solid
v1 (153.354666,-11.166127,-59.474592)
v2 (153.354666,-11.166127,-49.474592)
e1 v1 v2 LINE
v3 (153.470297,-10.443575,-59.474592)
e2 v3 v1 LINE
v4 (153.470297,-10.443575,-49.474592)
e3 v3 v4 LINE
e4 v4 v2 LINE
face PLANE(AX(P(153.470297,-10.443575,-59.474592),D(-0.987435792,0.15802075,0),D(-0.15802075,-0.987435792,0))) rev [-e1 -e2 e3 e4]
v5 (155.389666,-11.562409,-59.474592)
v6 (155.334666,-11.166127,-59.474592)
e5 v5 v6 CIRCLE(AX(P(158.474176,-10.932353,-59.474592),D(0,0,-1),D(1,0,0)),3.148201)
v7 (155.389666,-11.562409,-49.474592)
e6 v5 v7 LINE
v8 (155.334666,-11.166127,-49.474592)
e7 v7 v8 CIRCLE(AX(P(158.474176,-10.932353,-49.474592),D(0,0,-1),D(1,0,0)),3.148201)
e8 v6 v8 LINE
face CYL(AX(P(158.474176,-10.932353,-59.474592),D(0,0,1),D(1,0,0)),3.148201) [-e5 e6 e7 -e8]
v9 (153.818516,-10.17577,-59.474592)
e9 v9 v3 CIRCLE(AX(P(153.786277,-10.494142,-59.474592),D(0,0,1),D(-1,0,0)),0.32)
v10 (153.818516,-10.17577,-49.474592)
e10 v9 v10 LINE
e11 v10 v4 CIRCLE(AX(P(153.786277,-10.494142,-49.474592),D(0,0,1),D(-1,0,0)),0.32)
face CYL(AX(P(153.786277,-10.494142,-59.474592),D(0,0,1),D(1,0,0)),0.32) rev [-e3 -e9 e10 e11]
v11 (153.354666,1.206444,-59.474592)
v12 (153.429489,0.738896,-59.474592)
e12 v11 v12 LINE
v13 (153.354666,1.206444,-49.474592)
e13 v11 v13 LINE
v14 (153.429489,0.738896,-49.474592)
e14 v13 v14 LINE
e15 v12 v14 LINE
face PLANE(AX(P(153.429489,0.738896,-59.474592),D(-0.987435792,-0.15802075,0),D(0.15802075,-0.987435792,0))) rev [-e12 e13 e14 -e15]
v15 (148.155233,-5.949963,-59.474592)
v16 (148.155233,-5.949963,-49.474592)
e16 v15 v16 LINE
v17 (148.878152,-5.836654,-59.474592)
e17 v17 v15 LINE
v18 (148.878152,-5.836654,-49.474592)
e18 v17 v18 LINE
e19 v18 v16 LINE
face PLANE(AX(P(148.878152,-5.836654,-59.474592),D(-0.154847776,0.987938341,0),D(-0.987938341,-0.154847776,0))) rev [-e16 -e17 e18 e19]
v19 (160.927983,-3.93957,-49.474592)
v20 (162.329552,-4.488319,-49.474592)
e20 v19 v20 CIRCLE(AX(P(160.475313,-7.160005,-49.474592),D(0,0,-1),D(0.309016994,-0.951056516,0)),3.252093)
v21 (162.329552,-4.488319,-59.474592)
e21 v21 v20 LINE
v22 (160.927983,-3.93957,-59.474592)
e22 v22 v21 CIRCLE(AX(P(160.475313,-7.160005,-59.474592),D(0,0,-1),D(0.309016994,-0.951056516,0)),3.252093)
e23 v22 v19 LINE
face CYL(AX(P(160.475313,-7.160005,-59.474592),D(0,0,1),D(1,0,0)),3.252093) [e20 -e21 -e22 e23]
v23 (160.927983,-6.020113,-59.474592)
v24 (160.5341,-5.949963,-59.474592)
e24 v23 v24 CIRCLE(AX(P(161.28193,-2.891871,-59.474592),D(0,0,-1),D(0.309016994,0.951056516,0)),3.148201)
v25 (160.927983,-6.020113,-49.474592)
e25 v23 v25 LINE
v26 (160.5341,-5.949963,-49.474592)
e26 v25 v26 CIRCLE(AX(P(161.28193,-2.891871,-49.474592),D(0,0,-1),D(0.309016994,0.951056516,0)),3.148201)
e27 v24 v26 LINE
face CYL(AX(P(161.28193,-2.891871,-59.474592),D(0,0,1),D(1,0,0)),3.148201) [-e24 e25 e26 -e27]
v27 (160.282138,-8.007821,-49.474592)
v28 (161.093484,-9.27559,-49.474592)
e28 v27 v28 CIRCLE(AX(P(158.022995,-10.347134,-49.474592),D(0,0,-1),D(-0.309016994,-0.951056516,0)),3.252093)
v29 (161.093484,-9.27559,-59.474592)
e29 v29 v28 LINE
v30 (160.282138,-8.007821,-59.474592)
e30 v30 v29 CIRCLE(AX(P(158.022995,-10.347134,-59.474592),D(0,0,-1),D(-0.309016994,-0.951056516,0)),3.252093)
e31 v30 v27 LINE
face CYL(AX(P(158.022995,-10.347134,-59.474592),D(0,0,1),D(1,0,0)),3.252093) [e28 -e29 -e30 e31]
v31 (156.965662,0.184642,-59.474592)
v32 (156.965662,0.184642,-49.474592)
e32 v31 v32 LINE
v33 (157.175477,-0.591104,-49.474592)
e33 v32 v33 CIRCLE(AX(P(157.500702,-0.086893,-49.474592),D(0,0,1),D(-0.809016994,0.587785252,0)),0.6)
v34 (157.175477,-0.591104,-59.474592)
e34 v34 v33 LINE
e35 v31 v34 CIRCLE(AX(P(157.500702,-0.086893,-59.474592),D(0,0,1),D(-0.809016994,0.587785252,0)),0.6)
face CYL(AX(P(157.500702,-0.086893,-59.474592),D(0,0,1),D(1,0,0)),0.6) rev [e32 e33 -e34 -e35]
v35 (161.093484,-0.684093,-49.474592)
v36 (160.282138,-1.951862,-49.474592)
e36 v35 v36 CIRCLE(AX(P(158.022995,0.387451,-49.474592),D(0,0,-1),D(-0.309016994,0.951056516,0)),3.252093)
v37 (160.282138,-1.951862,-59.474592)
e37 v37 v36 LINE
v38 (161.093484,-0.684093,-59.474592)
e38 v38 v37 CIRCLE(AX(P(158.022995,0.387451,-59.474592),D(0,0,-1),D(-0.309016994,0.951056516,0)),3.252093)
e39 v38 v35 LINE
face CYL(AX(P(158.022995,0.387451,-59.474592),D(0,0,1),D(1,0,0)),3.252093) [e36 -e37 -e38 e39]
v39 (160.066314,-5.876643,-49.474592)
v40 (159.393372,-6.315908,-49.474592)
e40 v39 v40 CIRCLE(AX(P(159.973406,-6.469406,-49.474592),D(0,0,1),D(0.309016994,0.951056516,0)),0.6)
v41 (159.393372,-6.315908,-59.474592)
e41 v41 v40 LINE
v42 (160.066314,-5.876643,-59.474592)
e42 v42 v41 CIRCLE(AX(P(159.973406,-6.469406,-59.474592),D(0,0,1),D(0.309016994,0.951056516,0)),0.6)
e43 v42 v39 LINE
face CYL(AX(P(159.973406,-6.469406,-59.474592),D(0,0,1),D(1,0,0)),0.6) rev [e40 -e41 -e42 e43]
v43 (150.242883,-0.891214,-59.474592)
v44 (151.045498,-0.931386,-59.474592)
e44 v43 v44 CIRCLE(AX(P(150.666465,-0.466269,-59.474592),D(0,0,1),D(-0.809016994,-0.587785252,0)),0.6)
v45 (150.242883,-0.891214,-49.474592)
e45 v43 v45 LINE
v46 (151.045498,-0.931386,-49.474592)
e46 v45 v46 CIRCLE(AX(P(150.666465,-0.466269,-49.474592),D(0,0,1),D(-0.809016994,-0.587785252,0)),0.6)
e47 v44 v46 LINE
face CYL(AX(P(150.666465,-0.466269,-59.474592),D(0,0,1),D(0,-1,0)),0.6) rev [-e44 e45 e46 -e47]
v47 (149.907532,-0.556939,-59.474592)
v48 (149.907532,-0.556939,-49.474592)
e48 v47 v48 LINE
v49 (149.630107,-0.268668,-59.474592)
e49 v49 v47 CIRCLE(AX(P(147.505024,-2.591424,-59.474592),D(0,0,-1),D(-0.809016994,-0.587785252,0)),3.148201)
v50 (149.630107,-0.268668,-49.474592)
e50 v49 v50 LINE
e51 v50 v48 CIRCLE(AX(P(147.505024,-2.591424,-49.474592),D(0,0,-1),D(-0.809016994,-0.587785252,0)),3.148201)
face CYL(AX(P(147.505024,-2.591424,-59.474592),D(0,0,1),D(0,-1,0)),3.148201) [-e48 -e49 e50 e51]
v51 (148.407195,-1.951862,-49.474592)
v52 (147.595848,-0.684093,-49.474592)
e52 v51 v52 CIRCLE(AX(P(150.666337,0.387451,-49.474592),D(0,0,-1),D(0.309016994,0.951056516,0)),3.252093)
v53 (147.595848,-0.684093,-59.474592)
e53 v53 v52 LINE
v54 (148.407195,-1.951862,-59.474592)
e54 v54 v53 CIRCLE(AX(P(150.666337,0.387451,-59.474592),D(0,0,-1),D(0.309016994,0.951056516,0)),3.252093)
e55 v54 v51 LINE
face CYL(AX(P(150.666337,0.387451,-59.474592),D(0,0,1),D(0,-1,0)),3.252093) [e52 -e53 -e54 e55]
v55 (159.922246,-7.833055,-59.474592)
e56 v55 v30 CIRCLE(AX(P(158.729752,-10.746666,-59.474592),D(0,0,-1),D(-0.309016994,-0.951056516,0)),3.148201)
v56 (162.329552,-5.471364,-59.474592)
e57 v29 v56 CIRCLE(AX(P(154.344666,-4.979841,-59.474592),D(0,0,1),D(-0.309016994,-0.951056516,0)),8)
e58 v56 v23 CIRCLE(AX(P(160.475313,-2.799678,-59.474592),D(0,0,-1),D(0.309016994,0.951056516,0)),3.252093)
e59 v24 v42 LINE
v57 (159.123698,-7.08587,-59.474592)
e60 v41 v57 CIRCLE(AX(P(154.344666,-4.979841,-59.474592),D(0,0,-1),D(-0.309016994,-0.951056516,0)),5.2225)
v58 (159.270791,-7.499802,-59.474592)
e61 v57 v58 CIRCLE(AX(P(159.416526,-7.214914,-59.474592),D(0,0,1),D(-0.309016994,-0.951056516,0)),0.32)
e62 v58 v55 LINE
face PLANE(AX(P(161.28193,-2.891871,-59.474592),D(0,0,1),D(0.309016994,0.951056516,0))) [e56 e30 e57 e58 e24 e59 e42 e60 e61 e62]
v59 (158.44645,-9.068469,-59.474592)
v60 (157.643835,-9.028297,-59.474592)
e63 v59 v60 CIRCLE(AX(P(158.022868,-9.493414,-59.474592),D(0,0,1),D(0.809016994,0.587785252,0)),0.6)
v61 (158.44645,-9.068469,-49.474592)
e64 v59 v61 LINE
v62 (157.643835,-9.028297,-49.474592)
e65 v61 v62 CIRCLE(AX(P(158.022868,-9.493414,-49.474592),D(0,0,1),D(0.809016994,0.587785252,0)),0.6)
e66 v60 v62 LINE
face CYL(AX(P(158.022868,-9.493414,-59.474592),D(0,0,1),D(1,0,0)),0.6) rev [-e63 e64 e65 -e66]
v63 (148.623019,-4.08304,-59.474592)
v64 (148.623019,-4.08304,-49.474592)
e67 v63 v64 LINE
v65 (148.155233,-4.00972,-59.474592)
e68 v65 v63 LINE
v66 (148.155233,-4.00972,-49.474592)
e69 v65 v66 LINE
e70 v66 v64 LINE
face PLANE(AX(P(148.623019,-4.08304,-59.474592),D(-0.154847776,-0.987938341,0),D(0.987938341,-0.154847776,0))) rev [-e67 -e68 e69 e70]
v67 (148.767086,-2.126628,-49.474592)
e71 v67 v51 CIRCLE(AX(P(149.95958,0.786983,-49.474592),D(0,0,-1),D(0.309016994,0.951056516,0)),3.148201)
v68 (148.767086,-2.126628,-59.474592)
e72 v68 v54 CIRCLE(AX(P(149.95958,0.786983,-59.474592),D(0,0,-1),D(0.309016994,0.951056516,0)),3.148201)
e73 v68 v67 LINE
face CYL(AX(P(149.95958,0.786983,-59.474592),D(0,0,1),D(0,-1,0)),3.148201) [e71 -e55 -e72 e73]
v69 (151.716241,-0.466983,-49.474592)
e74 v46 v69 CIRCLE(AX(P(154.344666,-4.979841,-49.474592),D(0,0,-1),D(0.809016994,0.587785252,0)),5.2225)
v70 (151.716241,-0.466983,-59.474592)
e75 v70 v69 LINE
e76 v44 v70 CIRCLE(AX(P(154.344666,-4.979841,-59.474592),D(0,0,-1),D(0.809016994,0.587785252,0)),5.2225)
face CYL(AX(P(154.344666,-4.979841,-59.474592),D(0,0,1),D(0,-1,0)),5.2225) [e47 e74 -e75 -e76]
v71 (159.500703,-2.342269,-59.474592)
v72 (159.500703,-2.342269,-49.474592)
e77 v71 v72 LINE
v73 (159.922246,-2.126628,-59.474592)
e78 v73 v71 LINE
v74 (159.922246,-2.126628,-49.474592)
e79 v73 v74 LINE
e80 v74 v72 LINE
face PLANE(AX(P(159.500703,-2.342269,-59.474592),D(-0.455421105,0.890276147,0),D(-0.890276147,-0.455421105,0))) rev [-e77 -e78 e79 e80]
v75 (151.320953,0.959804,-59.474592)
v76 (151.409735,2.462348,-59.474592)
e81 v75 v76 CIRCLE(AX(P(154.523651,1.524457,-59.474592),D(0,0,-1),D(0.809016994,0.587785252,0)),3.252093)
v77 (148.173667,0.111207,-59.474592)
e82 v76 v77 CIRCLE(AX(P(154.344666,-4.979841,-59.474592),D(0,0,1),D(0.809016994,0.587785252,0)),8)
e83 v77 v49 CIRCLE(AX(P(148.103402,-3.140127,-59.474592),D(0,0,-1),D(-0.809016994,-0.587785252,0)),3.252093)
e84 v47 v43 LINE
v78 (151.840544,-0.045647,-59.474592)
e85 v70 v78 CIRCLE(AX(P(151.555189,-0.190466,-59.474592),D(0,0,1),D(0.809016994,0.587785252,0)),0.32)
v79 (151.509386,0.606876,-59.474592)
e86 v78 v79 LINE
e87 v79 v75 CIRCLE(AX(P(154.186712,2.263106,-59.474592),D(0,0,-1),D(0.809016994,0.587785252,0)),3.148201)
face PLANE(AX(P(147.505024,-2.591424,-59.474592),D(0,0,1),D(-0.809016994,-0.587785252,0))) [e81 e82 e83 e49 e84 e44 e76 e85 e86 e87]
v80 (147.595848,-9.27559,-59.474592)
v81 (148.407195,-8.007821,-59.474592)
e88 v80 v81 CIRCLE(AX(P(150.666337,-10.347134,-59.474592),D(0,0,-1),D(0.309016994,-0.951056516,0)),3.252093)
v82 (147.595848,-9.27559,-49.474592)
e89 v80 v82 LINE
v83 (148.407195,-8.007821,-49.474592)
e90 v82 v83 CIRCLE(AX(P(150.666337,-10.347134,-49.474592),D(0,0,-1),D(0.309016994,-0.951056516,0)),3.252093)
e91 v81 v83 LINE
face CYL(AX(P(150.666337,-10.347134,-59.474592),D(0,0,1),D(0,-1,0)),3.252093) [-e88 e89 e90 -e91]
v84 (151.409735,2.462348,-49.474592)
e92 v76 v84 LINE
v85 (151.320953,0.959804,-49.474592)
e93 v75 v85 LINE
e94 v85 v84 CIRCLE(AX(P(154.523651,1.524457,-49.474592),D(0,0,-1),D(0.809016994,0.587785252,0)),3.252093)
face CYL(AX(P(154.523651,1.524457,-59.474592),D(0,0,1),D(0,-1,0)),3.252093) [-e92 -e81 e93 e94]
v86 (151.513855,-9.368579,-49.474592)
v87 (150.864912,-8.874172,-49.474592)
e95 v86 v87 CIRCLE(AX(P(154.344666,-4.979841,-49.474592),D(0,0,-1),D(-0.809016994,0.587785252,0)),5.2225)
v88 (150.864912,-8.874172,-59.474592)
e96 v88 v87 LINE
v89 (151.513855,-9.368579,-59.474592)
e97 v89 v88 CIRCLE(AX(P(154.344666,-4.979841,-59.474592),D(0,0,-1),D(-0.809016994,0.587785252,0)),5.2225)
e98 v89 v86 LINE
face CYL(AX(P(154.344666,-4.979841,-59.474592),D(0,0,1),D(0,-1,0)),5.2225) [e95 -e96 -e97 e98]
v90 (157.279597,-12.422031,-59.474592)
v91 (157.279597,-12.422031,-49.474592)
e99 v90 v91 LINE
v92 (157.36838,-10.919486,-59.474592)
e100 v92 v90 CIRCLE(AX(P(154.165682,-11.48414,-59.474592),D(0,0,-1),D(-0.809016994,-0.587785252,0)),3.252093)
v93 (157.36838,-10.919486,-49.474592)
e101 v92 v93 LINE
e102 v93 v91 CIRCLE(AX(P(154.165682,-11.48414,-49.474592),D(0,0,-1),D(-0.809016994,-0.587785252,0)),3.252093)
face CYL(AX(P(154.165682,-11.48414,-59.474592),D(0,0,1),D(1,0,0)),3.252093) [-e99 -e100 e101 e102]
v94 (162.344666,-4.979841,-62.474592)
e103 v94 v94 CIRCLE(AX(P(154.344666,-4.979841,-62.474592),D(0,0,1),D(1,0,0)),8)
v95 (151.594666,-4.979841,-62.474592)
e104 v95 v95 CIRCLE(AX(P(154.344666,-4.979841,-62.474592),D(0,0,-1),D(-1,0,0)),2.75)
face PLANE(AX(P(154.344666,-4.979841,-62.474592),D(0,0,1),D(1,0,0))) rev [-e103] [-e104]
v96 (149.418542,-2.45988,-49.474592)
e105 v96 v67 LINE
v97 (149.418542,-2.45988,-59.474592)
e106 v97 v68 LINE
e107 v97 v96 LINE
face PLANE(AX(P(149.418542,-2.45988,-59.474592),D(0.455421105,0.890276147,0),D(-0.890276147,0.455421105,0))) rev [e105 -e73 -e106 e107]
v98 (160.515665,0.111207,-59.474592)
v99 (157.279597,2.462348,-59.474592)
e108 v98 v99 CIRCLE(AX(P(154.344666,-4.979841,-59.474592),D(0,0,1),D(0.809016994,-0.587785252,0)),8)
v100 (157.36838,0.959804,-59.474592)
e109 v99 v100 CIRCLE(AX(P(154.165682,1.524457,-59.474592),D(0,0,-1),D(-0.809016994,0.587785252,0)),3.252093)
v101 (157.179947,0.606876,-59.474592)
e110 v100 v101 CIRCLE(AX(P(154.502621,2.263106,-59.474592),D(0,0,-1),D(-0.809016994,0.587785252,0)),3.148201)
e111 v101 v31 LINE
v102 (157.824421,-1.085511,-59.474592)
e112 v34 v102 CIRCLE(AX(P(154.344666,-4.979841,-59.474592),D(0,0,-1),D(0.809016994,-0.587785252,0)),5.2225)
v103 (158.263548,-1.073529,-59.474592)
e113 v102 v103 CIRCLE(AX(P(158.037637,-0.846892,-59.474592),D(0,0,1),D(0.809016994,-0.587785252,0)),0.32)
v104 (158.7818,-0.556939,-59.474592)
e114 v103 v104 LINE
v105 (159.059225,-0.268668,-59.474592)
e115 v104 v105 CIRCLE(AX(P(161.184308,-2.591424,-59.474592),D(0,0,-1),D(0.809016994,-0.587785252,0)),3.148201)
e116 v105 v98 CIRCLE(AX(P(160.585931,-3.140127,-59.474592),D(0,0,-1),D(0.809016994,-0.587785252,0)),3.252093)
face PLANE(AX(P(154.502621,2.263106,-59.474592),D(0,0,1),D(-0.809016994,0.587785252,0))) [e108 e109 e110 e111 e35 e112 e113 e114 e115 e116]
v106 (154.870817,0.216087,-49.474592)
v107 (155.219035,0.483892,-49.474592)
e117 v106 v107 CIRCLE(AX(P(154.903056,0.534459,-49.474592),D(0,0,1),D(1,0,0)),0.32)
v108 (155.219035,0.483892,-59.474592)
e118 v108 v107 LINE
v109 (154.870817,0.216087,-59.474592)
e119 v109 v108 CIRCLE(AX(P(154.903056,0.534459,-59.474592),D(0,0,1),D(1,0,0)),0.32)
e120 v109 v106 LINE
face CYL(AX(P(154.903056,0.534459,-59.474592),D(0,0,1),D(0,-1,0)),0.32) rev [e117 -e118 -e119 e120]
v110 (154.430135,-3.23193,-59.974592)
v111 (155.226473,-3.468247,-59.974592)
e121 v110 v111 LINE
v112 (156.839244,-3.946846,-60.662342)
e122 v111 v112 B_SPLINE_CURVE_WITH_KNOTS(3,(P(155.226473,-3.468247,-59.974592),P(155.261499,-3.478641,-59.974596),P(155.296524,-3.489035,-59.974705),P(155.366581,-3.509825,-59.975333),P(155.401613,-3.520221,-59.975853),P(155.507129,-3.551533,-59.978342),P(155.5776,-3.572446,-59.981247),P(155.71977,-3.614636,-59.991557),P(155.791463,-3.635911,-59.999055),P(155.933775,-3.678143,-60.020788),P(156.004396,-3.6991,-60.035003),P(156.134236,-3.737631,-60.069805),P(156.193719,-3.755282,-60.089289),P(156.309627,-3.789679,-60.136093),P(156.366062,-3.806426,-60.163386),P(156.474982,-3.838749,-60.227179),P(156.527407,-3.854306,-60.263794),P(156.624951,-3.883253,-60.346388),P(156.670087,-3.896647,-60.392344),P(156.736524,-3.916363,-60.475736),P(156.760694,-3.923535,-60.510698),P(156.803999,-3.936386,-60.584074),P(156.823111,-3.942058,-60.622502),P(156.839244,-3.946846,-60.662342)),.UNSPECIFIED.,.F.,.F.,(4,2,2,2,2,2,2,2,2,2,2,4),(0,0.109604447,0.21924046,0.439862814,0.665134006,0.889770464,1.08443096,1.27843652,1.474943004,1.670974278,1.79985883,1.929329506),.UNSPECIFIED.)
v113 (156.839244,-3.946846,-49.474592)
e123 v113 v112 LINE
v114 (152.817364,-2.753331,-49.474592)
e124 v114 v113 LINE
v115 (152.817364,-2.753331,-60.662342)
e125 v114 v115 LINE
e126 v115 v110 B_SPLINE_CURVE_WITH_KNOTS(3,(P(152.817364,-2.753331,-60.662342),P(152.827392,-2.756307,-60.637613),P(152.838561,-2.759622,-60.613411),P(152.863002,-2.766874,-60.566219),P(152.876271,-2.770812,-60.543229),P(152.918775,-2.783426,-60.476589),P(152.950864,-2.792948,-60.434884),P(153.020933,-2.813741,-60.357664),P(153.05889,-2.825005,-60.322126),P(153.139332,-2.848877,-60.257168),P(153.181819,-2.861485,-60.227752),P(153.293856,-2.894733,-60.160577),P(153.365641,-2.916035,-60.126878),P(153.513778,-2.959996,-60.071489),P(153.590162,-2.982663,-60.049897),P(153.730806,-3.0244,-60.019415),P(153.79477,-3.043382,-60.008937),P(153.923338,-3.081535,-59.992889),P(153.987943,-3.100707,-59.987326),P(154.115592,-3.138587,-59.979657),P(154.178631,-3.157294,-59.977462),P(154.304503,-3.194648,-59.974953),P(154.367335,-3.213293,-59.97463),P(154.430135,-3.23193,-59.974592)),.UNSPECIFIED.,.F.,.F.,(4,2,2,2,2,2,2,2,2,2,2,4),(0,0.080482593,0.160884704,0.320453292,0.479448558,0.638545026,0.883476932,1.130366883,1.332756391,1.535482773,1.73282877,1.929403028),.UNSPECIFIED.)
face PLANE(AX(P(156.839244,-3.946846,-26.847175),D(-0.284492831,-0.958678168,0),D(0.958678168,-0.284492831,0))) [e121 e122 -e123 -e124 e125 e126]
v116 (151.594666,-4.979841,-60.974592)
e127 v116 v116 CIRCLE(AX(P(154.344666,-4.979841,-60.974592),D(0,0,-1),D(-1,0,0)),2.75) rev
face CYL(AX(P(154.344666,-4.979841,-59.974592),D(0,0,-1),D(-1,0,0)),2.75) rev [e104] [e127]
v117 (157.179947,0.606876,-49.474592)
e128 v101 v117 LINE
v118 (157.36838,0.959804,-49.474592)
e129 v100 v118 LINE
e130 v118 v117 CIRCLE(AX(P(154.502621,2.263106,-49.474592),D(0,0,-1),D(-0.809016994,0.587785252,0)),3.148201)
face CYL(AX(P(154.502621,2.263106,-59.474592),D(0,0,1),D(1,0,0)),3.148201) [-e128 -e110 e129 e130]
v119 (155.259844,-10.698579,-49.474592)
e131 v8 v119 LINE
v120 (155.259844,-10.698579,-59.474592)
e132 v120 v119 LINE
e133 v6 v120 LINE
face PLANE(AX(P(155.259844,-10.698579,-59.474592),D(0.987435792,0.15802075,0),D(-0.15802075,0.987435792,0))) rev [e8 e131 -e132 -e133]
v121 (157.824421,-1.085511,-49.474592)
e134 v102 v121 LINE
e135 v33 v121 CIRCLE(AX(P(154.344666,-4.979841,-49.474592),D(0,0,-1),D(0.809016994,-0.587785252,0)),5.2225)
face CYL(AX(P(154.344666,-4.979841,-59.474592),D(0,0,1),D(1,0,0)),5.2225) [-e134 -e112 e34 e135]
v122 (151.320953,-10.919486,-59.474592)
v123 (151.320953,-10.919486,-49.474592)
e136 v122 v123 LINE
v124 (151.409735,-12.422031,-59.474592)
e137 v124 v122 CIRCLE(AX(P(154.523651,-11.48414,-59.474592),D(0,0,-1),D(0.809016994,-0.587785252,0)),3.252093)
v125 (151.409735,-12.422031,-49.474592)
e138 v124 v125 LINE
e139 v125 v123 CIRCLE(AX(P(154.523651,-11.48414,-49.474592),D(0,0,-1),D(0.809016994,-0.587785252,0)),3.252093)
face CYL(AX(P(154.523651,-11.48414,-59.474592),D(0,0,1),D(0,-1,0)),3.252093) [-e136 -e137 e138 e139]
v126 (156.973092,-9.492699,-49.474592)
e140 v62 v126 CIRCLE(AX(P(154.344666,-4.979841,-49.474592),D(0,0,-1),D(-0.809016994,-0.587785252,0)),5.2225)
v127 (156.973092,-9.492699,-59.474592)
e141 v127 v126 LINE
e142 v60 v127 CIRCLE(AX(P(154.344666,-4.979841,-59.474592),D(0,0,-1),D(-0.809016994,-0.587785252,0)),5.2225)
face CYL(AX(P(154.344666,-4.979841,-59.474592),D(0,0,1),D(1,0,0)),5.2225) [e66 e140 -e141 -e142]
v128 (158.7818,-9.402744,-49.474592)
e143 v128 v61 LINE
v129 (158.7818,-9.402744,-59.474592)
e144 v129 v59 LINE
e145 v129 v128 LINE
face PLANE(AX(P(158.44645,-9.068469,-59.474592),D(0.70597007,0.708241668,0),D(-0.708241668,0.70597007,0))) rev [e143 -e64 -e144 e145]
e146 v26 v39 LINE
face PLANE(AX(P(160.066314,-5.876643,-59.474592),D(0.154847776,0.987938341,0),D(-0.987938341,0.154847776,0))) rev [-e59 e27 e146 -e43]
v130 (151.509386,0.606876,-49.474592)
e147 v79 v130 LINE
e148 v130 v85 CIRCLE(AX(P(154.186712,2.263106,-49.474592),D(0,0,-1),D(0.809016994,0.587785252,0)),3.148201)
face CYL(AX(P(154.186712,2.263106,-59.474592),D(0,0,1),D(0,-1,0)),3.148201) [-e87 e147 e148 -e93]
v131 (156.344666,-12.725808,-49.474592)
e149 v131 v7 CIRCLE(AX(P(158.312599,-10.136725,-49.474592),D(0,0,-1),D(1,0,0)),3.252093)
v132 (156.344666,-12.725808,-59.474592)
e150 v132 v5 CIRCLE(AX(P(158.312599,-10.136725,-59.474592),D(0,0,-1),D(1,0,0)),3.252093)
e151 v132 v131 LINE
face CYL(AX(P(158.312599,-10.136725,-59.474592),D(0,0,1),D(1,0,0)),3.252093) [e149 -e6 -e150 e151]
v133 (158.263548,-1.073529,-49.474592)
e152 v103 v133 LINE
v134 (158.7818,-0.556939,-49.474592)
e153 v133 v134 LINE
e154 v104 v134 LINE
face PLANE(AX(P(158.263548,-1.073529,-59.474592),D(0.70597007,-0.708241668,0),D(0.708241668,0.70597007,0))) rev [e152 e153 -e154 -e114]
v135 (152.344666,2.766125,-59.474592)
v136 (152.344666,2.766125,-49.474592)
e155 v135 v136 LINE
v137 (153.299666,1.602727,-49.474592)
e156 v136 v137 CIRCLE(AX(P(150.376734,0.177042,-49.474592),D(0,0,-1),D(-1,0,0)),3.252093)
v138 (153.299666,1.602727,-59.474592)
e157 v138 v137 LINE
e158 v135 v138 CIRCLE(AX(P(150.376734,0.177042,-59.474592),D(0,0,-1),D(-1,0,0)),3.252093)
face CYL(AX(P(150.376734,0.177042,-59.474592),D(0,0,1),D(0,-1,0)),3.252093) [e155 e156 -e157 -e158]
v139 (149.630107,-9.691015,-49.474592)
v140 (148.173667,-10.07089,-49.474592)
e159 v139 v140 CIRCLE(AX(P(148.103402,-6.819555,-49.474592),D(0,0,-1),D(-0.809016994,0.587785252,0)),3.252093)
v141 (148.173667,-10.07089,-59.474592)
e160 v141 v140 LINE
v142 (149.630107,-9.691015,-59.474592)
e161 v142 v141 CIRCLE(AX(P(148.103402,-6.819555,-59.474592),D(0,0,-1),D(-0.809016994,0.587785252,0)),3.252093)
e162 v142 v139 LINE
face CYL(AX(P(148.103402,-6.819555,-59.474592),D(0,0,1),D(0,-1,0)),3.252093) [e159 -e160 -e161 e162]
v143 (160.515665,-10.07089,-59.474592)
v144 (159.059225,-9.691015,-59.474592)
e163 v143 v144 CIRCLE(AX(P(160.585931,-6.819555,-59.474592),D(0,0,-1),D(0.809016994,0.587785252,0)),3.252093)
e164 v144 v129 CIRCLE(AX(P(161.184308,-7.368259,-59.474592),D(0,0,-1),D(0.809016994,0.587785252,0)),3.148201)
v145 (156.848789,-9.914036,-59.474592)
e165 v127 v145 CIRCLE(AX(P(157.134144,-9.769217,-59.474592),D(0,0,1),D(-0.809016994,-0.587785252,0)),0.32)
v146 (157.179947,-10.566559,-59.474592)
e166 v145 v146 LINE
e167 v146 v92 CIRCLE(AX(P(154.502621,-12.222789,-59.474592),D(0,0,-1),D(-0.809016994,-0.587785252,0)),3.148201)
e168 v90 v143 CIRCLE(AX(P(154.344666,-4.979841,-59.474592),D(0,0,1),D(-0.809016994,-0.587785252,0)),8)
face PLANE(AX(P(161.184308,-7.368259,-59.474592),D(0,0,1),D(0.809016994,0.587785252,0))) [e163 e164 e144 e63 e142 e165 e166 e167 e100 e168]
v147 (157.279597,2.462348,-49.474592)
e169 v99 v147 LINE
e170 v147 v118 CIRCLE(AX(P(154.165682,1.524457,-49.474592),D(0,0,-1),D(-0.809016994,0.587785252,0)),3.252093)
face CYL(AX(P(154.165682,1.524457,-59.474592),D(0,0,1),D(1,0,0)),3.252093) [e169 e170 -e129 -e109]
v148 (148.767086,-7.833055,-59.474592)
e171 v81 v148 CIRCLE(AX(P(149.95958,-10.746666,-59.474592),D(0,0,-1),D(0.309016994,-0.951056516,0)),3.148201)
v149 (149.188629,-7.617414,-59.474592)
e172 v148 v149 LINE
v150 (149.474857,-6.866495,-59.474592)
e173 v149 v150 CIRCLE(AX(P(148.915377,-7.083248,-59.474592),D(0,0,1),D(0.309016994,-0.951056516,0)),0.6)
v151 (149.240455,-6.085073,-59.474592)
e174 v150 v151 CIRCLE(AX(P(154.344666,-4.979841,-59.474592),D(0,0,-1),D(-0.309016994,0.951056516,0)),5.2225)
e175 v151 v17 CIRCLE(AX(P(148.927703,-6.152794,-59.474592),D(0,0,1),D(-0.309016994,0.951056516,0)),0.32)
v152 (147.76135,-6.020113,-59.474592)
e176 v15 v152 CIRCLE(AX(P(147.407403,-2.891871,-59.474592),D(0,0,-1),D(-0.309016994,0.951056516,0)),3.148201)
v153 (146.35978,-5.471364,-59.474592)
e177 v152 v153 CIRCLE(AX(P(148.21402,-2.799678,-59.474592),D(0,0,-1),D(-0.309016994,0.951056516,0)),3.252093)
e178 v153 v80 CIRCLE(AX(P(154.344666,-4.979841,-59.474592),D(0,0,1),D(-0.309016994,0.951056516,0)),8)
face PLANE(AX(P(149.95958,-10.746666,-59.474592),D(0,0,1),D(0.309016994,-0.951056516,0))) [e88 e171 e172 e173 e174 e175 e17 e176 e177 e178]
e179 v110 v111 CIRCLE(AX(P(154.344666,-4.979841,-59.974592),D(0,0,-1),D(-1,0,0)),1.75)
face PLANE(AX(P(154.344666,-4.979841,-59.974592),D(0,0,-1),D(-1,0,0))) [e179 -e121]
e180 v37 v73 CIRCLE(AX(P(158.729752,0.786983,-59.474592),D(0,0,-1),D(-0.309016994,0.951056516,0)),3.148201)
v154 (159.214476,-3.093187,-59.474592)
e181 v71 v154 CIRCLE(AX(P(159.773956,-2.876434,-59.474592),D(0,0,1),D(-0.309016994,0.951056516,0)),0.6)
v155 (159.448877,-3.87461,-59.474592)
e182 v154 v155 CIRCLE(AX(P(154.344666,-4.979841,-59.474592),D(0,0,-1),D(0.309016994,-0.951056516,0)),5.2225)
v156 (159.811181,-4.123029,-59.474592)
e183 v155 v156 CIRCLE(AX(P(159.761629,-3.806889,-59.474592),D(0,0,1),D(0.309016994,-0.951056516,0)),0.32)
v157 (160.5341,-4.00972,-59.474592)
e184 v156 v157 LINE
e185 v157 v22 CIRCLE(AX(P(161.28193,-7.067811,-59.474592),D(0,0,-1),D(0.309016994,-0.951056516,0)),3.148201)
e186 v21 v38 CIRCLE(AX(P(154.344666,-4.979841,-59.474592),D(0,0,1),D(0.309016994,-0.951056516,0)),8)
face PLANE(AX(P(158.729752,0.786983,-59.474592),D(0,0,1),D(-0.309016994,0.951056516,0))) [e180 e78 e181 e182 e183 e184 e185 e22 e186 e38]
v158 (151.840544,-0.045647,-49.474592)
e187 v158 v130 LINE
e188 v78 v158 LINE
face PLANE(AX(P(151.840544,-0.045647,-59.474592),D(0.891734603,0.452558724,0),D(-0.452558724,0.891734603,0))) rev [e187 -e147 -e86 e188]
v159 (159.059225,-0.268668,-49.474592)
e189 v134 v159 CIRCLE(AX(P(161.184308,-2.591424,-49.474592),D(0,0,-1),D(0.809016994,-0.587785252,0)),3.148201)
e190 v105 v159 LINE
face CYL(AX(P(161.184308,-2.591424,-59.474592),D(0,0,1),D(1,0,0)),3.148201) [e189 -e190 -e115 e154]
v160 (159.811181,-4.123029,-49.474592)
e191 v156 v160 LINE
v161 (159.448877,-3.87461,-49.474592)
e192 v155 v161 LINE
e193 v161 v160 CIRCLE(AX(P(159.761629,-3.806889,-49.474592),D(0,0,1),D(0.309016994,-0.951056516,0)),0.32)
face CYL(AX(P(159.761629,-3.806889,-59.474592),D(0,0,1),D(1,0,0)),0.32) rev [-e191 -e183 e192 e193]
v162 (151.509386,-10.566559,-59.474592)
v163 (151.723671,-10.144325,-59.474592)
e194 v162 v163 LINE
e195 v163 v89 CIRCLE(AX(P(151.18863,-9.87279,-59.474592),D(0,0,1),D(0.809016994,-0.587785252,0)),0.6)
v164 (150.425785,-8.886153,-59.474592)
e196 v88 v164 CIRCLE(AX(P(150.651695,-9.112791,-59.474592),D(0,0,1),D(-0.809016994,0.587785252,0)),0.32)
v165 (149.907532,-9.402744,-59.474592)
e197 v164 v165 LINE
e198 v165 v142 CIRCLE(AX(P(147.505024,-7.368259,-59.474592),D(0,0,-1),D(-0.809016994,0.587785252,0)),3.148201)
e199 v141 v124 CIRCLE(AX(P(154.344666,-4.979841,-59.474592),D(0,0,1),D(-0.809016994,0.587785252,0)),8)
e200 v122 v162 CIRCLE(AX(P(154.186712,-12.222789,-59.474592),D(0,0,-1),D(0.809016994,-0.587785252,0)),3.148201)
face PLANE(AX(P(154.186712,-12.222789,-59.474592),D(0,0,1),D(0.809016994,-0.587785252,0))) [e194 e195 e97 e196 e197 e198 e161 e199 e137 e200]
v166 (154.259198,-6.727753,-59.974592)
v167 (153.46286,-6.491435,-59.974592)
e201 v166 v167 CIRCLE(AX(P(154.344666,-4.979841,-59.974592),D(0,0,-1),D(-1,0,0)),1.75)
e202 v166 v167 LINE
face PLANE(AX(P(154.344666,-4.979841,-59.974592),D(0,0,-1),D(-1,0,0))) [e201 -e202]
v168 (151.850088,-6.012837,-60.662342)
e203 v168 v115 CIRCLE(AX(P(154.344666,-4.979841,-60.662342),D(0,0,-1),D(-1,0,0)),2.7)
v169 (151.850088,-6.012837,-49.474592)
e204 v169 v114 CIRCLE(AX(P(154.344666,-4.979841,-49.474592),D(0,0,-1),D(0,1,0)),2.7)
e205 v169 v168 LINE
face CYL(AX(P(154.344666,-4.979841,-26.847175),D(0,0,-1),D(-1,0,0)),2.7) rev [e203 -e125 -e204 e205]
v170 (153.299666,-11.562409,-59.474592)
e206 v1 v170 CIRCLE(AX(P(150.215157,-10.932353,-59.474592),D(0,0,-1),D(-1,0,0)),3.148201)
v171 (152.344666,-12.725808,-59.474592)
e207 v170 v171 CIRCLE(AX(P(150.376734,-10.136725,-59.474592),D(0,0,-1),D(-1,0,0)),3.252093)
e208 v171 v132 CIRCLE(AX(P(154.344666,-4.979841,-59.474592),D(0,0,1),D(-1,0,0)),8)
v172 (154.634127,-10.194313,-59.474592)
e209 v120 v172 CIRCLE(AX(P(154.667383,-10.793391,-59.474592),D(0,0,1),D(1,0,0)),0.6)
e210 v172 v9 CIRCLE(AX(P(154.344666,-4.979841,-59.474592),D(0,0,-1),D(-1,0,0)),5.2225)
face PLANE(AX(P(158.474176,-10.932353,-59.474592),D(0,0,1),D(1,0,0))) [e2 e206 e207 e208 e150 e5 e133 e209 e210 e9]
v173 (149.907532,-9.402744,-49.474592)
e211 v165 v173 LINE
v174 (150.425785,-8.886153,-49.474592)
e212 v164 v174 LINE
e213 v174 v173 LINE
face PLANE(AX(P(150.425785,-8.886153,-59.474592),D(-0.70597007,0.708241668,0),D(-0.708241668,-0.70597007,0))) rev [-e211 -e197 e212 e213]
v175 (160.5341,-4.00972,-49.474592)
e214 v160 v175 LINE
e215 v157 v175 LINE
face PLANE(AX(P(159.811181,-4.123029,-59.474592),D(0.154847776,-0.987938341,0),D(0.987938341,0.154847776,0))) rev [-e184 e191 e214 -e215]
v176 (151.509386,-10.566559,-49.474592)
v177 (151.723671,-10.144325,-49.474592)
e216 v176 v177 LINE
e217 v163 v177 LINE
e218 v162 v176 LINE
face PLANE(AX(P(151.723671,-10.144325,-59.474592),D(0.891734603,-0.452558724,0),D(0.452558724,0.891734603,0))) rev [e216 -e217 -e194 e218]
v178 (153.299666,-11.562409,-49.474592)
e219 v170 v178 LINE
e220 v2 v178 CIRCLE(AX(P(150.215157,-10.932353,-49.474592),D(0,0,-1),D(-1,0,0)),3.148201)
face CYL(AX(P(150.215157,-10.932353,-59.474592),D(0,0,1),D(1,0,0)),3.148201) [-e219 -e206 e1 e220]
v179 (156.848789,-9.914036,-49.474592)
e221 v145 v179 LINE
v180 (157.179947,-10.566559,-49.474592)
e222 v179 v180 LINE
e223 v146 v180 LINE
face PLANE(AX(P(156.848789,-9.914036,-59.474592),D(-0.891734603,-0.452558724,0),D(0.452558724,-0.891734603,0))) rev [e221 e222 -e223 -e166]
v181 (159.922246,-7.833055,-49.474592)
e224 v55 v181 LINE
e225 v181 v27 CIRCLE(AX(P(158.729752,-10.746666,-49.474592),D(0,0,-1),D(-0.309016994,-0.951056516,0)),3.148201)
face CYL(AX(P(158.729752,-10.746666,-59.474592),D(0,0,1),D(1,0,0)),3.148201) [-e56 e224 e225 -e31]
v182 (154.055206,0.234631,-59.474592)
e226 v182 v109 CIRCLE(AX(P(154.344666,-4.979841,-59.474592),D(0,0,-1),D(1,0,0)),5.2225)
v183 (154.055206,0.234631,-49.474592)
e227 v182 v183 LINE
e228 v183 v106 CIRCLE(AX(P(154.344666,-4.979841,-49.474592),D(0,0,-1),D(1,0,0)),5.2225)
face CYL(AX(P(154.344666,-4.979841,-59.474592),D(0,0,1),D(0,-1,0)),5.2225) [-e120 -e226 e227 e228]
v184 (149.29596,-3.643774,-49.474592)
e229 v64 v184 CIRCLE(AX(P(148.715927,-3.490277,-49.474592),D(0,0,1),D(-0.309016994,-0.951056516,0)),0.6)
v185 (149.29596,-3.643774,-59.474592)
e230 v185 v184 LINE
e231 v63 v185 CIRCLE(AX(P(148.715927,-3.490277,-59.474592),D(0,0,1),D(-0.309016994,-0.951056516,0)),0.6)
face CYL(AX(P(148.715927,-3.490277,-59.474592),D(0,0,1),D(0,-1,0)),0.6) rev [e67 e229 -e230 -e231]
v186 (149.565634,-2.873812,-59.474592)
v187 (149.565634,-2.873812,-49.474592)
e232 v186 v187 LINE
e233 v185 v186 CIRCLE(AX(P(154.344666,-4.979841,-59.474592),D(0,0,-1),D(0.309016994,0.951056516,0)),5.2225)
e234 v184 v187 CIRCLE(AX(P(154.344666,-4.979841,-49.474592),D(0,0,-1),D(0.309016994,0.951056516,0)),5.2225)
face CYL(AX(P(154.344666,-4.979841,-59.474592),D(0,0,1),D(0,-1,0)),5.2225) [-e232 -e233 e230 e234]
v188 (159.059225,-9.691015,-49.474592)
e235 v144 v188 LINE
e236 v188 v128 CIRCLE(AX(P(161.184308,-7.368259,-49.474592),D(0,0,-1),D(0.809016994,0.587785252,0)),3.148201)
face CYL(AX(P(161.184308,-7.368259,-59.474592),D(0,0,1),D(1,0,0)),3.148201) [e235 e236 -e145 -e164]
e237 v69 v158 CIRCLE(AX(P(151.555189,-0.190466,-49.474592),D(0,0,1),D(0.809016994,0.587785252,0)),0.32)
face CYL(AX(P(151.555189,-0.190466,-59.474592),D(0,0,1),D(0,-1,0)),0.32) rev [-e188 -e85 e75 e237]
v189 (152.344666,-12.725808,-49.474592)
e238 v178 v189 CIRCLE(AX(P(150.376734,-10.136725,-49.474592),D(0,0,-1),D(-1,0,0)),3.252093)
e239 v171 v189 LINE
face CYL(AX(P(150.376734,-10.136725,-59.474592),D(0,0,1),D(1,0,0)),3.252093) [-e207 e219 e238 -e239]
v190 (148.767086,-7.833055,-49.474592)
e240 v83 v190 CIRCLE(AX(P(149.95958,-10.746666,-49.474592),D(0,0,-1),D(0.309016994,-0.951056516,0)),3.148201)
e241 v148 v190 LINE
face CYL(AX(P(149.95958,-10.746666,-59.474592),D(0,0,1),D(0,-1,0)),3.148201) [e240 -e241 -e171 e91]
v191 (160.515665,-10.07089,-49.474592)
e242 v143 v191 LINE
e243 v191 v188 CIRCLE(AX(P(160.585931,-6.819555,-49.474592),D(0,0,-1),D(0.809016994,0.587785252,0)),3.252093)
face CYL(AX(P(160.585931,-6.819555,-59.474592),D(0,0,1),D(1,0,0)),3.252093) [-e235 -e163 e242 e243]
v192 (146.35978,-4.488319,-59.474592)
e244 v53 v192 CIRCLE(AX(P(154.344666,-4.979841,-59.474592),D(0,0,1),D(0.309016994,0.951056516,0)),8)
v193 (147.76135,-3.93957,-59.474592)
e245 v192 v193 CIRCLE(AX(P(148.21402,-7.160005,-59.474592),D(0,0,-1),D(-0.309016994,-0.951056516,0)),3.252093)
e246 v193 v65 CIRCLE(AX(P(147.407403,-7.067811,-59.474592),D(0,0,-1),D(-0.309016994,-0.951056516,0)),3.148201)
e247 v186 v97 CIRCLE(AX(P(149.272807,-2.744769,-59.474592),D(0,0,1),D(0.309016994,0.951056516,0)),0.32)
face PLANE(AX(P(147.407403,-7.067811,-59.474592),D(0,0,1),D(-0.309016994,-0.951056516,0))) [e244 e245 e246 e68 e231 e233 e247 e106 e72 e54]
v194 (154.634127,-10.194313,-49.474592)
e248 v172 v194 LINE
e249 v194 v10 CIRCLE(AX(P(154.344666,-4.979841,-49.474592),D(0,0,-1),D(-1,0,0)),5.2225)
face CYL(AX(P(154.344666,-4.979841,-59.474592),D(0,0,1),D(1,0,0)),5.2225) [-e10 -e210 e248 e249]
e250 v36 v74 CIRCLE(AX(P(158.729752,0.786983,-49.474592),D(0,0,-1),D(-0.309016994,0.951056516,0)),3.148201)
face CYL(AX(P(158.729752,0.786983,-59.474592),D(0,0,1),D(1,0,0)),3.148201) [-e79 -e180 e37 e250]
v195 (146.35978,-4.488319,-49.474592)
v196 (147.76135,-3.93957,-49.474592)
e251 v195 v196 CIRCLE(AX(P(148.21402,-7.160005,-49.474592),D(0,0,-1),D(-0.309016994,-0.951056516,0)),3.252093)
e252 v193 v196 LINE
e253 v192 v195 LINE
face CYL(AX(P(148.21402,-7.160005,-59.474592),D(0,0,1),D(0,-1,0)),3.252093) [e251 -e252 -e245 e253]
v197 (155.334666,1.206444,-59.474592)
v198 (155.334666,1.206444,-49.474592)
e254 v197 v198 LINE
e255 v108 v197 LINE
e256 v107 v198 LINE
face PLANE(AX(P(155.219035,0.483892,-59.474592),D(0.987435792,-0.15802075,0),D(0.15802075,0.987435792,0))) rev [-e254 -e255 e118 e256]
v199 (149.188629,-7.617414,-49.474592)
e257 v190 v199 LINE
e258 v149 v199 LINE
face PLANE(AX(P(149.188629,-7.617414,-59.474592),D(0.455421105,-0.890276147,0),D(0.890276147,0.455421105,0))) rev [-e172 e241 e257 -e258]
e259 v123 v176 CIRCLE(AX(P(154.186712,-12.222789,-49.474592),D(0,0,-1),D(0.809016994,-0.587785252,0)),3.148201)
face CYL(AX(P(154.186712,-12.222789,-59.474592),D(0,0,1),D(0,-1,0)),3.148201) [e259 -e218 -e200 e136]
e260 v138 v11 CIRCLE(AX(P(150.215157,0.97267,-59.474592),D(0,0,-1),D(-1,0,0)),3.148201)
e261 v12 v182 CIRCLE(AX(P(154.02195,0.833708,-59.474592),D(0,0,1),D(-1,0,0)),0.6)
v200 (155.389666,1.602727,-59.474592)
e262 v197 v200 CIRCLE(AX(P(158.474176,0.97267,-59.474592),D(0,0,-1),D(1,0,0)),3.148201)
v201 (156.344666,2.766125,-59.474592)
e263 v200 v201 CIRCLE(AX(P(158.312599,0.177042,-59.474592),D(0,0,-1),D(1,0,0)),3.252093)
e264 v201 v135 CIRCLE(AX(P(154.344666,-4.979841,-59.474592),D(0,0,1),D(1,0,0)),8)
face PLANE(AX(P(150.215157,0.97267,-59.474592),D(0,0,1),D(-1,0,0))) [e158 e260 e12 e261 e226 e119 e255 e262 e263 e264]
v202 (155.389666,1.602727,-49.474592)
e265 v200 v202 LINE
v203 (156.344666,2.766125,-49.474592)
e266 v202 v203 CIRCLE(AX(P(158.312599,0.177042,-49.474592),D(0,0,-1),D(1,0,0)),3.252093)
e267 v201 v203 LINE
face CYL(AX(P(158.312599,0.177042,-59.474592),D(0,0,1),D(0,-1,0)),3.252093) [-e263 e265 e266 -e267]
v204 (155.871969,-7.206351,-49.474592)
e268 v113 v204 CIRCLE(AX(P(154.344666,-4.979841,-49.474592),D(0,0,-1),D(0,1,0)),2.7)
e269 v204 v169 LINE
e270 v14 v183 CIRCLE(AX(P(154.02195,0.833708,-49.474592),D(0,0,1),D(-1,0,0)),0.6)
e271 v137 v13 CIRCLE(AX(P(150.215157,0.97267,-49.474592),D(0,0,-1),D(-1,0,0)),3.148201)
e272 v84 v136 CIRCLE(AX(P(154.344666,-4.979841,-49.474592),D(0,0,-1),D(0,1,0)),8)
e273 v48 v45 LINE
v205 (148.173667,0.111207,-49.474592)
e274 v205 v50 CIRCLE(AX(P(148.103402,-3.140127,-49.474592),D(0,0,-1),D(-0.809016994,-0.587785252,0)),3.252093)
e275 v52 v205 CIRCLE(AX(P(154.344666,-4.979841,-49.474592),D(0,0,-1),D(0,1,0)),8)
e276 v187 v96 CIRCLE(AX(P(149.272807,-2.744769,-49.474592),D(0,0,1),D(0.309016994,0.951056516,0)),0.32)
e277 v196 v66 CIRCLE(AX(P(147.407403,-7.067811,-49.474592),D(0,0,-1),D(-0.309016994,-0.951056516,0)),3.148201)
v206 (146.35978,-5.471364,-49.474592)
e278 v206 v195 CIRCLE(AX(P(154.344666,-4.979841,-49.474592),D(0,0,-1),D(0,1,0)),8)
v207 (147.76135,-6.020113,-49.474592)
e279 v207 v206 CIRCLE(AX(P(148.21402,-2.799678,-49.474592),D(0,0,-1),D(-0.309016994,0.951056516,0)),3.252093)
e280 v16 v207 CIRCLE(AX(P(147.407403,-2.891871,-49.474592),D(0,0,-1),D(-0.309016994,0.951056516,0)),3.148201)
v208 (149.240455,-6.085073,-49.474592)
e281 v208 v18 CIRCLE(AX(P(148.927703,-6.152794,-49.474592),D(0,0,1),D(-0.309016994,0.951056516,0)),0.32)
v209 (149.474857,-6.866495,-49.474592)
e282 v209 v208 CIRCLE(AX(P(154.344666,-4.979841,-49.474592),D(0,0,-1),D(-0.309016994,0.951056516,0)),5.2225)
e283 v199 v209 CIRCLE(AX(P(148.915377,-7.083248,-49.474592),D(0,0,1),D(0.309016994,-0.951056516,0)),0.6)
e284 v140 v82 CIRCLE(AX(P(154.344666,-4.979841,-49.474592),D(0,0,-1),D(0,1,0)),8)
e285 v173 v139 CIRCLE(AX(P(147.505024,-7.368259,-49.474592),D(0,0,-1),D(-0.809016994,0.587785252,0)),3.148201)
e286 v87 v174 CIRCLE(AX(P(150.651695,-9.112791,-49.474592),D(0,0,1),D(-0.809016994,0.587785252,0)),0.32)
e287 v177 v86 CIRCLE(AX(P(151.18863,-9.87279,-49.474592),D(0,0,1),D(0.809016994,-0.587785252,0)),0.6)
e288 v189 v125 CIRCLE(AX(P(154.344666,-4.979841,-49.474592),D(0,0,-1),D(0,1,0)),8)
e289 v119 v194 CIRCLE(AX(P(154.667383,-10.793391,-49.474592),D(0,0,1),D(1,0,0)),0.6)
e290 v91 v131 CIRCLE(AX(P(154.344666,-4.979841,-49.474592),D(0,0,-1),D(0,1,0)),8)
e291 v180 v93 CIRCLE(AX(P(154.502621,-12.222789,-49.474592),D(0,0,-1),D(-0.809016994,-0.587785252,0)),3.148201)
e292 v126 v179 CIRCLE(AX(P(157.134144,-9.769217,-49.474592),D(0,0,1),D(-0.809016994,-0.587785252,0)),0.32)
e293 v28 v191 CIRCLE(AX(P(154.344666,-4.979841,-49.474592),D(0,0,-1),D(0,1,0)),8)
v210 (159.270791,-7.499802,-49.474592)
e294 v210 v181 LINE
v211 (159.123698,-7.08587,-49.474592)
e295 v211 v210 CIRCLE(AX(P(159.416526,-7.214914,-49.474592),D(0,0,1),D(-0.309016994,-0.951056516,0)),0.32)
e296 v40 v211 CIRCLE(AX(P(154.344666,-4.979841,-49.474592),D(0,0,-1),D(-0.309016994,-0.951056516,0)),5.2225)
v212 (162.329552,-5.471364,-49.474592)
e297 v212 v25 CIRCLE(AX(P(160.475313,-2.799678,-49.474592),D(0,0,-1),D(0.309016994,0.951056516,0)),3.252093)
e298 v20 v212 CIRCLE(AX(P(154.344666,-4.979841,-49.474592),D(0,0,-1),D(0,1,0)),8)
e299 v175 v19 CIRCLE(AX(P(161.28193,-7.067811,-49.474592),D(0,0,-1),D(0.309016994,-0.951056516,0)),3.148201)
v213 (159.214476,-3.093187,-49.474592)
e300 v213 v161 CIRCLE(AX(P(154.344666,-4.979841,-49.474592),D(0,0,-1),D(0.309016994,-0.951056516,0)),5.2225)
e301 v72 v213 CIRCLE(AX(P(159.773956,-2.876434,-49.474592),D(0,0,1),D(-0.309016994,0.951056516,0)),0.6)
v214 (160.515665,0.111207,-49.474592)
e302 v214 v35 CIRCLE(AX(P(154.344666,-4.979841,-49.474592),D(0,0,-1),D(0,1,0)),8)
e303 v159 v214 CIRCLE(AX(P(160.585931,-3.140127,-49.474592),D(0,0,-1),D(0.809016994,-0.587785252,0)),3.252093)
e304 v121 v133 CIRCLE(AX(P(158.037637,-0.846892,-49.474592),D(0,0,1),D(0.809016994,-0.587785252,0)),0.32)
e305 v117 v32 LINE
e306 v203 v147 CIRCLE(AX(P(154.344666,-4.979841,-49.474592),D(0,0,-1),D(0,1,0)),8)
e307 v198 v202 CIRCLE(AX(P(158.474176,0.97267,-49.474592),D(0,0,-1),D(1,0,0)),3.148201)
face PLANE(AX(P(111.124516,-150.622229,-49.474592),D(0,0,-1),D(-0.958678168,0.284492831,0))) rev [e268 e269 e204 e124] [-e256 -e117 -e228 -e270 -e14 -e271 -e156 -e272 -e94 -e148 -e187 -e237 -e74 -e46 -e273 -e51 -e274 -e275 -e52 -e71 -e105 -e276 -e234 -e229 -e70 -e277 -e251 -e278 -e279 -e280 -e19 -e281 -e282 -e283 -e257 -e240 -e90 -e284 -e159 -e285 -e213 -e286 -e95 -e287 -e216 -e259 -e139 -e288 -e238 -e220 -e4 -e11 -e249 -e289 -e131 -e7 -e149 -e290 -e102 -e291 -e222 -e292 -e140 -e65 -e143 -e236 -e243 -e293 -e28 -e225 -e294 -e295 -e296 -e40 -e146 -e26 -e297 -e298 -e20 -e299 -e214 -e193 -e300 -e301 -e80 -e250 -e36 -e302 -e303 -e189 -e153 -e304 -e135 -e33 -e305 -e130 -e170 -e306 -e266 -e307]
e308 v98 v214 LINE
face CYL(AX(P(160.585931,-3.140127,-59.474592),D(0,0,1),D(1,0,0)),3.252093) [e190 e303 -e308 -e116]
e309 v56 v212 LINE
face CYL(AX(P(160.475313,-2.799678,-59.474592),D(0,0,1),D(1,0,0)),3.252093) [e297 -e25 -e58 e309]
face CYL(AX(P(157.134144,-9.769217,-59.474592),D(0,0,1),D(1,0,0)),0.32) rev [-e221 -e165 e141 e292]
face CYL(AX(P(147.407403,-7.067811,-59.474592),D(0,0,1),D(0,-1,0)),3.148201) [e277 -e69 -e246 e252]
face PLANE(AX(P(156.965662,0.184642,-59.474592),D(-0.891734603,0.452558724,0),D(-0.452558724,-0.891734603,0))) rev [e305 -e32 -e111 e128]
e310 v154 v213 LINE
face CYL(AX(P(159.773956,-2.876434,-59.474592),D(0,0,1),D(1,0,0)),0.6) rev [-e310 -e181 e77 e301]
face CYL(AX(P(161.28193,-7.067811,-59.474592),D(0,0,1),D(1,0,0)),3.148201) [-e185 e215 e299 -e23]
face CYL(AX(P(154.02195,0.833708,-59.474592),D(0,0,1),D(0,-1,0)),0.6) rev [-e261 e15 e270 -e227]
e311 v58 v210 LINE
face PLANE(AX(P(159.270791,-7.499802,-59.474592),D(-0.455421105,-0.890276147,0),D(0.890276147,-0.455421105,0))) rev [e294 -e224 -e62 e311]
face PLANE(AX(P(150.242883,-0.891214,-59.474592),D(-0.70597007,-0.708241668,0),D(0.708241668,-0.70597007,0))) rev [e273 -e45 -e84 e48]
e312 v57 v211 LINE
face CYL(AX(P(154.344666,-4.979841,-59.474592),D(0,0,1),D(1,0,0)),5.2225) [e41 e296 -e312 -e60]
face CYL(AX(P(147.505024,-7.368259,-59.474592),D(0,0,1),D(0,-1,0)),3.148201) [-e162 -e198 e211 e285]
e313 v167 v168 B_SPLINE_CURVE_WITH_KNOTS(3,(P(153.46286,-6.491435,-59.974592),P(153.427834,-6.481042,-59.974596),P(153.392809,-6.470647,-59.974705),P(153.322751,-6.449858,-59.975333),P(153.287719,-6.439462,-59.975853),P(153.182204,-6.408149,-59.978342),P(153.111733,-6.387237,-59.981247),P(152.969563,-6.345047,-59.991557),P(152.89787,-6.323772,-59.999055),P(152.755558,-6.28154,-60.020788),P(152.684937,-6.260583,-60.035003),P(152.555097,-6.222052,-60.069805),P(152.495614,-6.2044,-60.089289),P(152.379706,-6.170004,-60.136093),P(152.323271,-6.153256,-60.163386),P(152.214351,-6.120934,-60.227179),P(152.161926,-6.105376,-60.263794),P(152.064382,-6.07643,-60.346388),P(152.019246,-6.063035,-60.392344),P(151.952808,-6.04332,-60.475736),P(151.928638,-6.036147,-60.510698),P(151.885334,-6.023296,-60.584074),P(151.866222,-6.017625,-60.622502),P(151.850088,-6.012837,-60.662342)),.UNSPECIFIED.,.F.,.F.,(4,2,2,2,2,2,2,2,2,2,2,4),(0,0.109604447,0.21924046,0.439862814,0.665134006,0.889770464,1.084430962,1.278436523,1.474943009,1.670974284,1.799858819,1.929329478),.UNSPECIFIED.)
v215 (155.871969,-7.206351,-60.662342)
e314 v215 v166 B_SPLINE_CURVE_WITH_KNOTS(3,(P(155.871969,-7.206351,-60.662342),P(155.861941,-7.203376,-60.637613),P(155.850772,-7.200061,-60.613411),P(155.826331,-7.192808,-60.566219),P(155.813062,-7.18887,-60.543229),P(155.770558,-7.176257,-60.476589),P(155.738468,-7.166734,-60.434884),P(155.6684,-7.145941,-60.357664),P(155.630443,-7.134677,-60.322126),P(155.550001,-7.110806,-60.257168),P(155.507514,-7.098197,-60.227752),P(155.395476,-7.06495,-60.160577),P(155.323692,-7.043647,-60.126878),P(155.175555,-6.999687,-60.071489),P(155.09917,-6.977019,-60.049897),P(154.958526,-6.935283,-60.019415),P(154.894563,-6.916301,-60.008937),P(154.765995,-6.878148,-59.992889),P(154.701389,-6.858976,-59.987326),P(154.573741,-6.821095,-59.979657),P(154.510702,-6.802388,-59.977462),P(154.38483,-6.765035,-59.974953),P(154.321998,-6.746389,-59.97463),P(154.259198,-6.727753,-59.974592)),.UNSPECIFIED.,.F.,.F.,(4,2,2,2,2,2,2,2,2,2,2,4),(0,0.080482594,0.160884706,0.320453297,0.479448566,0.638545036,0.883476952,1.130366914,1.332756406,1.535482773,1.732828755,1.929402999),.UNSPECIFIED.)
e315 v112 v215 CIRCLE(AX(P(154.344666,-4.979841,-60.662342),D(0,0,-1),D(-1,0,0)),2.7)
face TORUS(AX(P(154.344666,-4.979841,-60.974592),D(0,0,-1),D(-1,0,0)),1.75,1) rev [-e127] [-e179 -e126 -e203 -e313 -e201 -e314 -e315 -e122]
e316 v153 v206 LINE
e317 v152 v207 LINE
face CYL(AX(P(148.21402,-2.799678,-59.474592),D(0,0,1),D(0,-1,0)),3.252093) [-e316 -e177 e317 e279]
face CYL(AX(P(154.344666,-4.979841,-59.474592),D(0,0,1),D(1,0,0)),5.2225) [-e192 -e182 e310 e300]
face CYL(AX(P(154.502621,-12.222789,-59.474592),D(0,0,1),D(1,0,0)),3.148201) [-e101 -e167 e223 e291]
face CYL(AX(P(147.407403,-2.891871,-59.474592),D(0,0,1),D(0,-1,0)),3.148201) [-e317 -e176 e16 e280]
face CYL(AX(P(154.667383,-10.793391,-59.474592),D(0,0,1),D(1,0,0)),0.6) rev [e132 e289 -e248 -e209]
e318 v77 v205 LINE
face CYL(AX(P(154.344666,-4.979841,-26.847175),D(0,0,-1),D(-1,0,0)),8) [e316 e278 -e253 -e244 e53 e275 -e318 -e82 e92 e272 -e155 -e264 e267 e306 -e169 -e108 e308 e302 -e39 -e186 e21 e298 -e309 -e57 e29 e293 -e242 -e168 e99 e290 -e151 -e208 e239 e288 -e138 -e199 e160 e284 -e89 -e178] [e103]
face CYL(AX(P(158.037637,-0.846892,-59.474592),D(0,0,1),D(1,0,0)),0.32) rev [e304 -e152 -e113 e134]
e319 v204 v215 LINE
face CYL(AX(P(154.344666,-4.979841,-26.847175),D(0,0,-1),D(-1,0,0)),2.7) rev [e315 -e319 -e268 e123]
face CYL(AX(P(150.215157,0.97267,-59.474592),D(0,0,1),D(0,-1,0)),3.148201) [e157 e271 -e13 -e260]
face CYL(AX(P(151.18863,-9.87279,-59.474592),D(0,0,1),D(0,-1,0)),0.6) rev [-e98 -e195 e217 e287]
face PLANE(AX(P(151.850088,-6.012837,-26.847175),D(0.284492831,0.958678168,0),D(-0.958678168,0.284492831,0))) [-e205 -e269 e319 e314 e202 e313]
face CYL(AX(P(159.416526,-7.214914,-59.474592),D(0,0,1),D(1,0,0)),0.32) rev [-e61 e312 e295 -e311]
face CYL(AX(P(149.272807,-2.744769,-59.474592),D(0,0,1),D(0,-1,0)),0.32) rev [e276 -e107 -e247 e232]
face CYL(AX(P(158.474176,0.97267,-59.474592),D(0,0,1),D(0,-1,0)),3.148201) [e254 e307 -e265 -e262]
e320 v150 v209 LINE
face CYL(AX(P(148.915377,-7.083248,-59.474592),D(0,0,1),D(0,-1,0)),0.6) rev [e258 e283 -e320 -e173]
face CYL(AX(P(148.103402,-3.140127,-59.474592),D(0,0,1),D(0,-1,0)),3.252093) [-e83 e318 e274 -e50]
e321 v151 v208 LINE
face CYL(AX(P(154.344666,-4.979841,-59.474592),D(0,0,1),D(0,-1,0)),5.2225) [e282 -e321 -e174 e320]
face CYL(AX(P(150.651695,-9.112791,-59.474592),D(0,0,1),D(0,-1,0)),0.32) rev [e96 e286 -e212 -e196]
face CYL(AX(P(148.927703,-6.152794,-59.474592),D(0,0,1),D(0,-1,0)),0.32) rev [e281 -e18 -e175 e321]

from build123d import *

# Parameters (mm, degrees)
ESBO_O1_R                = 8
RESSALTO_EXTRUS_O1_DEPTH = 13
CORTE_EXTRUS_O1_START    = -10
CORTE_EXTRUS_O1_DEPTH    = 10
PADR_OCIRCULAR1_COUNT    = 10
ESBO_O5_R                = 2.75
CORTE_EXTRUS_O2_DEPTH    = 2.5
FILETE1_R                = 1


with BuildPart() as part:
    # Esboço1 → Ressalto-extrusão1 (new body)
    with BuildSketch(Plane.XY.offset(-62.474592215)):
        with Locations(Location((154.344666384, -4.979841337, 0), (0, 0, 90))):
            Circle(ESBO_O1_R)
        with BuildLine():
            Line((156.839244486, -3.946845648), (152.817363907, -2.753331256))
            ThreePointArc((152.817363907, -2.753331256), (151.756235333, -4.211710693), (151.850088282, -6.012837026))
            Line((151.850088282, -6.012837026), (155.871968862, -7.206351418))
            ThreePointArc((155.871968862, -7.206351418), (156.933097439, -5.747971979), (156.839244486, -3.946845648))
        make_face(mode=Mode.SUBTRACT)
    extrude(amount=RESSALTO_EXTRUS_O1_DEPTH)

    # Esboço4 → Corte-extrusão1 (cut)
    with BuildSketch(Plane.XY.offset(-49.474592215).offset(CORTE_EXTRUS_O1_START)):
        with BuildLine():
            Line((155.259844023, -10.698578623), (155.334666384, -11.166126571))
            ThreePointArc((155.334666384, -11.166126571), (155.355864946, -11.365142474), (155.389666384, -11.562409225))
            ThreePointArc((155.389666384, -11.562409225), (155.798933371, -12.200119109), (156.344666384, -12.725808029))
            ThreePointArc((156.344666384, -12.725808029), (154.344666384, -12.979841337), (152.344666384, -12.725808029))
            ThreePointArc((152.344666384, -12.725808029), (152.890399398, -12.200119109), (153.299666384, -11.562409225))
            ThreePointArc((153.299666384, -11.562409225), (153.333467823, -11.365142474), (153.354666384, -11.166126571))
            Line((153.354666384, -11.166126571), (153.470297344, -10.443574954))
            ThreePointArc((153.470297344, -10.443574954), (153.591194582, -10.240482514), (153.8185158, -10.175769725))
            ThreePointArc((153.8185158, -10.175769725), (154.225958814, -10.20099205), (154.634127125, -10.194313384))
            ThreePointArc((154.634127125, -10.194313384), (155.043877847, -10.326217347), (155.259844023, -10.698578623))
        make_face()
    corte_extrus_o1 = extrude(amount=CORTE_EXTRUS_O1_DEPTH, mode=Mode.SUBTRACT)

    # PadrãoCircular1: Corte-extrusão1 ×10 about axis
    padr_ocircular1_axis = Axis((154.344666384, -4.979841337, 0), (0, 0, 1))
    for i in range(1, PADR_OCIRCULAR1_COUNT):
        add(corte_extrus_o1.rotate(padr_ocircular1_axis, i * 360 / PADR_OCIRCULAR1_COUNT), mode=Mode.SUBTRACT)

    # Esboço5 → Corte-extrusão2 (cut)
    with BuildSketch(Plane(origin=(0, 0, -62.474592215), x_dir=(-1, 0, 0), z_dir=(0, 0, -1))):
        with Locations((-154.344666384, -4.979841337)):
            Circle(ESBO_O5_R)
    extrude(amount=-CORTE_EXTRUS_O2_DEPTH, mode=Mode.SUBTRACT)

    # Filete1
    # the kernel refuses this fillet: 1 mm, written as the material it adds along each edge
    with BuildSketch(Plane(origin=(154.344666384, -4.979841337, -59.974592215), x_dir=(-1, 0, 0), z_dir=(0, -1, 0))) as filete1_piece_1_section:
        with BuildLine():
            CenterArc((2.75 - FILETE1_R, FILETE1_R), FILETE1_R, 270, 90)
            Line((2.75 - FILETE1_R, 0), (2.75, 0))
            Line((2.75, 0), (2.75, FILETE1_R))
        make_face()
    filete1_piece_1 = revolve(axis=Axis((154.344666384, -4.979841337, -59.974592215), (0, 0, -1)), mode=Mode.PRIVATE)
    filete1_piece_1 = filete1_piece_1 - Plane(origin=(154.344666389, -4.979841339, -60.815647373), x_dir=(-0.5656675853449286, 0.8246333627073538, 0), z_dir=(0, 0, -1)) * Cylinder(2.700000004, 12, mode=Mode.PRIVATE)
    add(filete1_piece_1)
    with BuildSketch(Plane(origin=(154.344666384, -4.979841337, -59.974592215), x_dir=(-1, 0, 0), z_dir=(0, -1, 0))) as filete1_piece_2_section:
        with BuildLine():
            CenterArc((2.75 - FILETE1_R, FILETE1_R), FILETE1_R, 270, 90)
            Line((2.75 - FILETE1_R, 0), (2.75, 0))
            Line((2.75, 0), (2.75, FILETE1_R))
        make_face()
    filete1_piece_2 = revolve(axis=Axis((154.344666384, -4.979841337, -59.974592215), (0, 0, -1)), mode=Mode.PRIVATE)
    filete1_piece_2 = split(filete1_piece_2, bisect_by=Plane(origin=(154.828304199, -3.350088453, -60.157362132), z_dir=(0.28449283065041153, 0.9586781677437514, 0)), keep=Keep.TOP, mode=Mode.PRIVATE)
    add(filete1_piece_2)
    with BuildSketch(Plane(origin=(154.344666384, -4.979841337, -59.974592215), x_dir=(-1, 0, 0), z_dir=(0, -1, 0))) as filete1_piece_3_section:
        with BuildLine():
            CenterArc((2.75 - FILETE1_R, FILETE1_R), FILETE1_R, 270, 90)
            Line((2.75 - FILETE1_R, 0), (2.75, 0))
            Line((2.75, 0), (2.75, FILETE1_R))
        make_face()
    filete1_piece_3 = revolve(axis=Axis((154.344666384, -4.979841337, -59.974592215), (0, 0, -1)), mode=Mode.PRIVATE)
    filete1_piece_3 = split(filete1_piece_3, bisect_by=Plane(origin=(152.118883506, -6.092603434, -60.089217232), z_dir=(-0.284492830650411, -0.9586781677437516, 0)), keep=Keep.TOP, mode=Mode.PRIVATE)
    add(filete1_piece_3)


solid = part.part
